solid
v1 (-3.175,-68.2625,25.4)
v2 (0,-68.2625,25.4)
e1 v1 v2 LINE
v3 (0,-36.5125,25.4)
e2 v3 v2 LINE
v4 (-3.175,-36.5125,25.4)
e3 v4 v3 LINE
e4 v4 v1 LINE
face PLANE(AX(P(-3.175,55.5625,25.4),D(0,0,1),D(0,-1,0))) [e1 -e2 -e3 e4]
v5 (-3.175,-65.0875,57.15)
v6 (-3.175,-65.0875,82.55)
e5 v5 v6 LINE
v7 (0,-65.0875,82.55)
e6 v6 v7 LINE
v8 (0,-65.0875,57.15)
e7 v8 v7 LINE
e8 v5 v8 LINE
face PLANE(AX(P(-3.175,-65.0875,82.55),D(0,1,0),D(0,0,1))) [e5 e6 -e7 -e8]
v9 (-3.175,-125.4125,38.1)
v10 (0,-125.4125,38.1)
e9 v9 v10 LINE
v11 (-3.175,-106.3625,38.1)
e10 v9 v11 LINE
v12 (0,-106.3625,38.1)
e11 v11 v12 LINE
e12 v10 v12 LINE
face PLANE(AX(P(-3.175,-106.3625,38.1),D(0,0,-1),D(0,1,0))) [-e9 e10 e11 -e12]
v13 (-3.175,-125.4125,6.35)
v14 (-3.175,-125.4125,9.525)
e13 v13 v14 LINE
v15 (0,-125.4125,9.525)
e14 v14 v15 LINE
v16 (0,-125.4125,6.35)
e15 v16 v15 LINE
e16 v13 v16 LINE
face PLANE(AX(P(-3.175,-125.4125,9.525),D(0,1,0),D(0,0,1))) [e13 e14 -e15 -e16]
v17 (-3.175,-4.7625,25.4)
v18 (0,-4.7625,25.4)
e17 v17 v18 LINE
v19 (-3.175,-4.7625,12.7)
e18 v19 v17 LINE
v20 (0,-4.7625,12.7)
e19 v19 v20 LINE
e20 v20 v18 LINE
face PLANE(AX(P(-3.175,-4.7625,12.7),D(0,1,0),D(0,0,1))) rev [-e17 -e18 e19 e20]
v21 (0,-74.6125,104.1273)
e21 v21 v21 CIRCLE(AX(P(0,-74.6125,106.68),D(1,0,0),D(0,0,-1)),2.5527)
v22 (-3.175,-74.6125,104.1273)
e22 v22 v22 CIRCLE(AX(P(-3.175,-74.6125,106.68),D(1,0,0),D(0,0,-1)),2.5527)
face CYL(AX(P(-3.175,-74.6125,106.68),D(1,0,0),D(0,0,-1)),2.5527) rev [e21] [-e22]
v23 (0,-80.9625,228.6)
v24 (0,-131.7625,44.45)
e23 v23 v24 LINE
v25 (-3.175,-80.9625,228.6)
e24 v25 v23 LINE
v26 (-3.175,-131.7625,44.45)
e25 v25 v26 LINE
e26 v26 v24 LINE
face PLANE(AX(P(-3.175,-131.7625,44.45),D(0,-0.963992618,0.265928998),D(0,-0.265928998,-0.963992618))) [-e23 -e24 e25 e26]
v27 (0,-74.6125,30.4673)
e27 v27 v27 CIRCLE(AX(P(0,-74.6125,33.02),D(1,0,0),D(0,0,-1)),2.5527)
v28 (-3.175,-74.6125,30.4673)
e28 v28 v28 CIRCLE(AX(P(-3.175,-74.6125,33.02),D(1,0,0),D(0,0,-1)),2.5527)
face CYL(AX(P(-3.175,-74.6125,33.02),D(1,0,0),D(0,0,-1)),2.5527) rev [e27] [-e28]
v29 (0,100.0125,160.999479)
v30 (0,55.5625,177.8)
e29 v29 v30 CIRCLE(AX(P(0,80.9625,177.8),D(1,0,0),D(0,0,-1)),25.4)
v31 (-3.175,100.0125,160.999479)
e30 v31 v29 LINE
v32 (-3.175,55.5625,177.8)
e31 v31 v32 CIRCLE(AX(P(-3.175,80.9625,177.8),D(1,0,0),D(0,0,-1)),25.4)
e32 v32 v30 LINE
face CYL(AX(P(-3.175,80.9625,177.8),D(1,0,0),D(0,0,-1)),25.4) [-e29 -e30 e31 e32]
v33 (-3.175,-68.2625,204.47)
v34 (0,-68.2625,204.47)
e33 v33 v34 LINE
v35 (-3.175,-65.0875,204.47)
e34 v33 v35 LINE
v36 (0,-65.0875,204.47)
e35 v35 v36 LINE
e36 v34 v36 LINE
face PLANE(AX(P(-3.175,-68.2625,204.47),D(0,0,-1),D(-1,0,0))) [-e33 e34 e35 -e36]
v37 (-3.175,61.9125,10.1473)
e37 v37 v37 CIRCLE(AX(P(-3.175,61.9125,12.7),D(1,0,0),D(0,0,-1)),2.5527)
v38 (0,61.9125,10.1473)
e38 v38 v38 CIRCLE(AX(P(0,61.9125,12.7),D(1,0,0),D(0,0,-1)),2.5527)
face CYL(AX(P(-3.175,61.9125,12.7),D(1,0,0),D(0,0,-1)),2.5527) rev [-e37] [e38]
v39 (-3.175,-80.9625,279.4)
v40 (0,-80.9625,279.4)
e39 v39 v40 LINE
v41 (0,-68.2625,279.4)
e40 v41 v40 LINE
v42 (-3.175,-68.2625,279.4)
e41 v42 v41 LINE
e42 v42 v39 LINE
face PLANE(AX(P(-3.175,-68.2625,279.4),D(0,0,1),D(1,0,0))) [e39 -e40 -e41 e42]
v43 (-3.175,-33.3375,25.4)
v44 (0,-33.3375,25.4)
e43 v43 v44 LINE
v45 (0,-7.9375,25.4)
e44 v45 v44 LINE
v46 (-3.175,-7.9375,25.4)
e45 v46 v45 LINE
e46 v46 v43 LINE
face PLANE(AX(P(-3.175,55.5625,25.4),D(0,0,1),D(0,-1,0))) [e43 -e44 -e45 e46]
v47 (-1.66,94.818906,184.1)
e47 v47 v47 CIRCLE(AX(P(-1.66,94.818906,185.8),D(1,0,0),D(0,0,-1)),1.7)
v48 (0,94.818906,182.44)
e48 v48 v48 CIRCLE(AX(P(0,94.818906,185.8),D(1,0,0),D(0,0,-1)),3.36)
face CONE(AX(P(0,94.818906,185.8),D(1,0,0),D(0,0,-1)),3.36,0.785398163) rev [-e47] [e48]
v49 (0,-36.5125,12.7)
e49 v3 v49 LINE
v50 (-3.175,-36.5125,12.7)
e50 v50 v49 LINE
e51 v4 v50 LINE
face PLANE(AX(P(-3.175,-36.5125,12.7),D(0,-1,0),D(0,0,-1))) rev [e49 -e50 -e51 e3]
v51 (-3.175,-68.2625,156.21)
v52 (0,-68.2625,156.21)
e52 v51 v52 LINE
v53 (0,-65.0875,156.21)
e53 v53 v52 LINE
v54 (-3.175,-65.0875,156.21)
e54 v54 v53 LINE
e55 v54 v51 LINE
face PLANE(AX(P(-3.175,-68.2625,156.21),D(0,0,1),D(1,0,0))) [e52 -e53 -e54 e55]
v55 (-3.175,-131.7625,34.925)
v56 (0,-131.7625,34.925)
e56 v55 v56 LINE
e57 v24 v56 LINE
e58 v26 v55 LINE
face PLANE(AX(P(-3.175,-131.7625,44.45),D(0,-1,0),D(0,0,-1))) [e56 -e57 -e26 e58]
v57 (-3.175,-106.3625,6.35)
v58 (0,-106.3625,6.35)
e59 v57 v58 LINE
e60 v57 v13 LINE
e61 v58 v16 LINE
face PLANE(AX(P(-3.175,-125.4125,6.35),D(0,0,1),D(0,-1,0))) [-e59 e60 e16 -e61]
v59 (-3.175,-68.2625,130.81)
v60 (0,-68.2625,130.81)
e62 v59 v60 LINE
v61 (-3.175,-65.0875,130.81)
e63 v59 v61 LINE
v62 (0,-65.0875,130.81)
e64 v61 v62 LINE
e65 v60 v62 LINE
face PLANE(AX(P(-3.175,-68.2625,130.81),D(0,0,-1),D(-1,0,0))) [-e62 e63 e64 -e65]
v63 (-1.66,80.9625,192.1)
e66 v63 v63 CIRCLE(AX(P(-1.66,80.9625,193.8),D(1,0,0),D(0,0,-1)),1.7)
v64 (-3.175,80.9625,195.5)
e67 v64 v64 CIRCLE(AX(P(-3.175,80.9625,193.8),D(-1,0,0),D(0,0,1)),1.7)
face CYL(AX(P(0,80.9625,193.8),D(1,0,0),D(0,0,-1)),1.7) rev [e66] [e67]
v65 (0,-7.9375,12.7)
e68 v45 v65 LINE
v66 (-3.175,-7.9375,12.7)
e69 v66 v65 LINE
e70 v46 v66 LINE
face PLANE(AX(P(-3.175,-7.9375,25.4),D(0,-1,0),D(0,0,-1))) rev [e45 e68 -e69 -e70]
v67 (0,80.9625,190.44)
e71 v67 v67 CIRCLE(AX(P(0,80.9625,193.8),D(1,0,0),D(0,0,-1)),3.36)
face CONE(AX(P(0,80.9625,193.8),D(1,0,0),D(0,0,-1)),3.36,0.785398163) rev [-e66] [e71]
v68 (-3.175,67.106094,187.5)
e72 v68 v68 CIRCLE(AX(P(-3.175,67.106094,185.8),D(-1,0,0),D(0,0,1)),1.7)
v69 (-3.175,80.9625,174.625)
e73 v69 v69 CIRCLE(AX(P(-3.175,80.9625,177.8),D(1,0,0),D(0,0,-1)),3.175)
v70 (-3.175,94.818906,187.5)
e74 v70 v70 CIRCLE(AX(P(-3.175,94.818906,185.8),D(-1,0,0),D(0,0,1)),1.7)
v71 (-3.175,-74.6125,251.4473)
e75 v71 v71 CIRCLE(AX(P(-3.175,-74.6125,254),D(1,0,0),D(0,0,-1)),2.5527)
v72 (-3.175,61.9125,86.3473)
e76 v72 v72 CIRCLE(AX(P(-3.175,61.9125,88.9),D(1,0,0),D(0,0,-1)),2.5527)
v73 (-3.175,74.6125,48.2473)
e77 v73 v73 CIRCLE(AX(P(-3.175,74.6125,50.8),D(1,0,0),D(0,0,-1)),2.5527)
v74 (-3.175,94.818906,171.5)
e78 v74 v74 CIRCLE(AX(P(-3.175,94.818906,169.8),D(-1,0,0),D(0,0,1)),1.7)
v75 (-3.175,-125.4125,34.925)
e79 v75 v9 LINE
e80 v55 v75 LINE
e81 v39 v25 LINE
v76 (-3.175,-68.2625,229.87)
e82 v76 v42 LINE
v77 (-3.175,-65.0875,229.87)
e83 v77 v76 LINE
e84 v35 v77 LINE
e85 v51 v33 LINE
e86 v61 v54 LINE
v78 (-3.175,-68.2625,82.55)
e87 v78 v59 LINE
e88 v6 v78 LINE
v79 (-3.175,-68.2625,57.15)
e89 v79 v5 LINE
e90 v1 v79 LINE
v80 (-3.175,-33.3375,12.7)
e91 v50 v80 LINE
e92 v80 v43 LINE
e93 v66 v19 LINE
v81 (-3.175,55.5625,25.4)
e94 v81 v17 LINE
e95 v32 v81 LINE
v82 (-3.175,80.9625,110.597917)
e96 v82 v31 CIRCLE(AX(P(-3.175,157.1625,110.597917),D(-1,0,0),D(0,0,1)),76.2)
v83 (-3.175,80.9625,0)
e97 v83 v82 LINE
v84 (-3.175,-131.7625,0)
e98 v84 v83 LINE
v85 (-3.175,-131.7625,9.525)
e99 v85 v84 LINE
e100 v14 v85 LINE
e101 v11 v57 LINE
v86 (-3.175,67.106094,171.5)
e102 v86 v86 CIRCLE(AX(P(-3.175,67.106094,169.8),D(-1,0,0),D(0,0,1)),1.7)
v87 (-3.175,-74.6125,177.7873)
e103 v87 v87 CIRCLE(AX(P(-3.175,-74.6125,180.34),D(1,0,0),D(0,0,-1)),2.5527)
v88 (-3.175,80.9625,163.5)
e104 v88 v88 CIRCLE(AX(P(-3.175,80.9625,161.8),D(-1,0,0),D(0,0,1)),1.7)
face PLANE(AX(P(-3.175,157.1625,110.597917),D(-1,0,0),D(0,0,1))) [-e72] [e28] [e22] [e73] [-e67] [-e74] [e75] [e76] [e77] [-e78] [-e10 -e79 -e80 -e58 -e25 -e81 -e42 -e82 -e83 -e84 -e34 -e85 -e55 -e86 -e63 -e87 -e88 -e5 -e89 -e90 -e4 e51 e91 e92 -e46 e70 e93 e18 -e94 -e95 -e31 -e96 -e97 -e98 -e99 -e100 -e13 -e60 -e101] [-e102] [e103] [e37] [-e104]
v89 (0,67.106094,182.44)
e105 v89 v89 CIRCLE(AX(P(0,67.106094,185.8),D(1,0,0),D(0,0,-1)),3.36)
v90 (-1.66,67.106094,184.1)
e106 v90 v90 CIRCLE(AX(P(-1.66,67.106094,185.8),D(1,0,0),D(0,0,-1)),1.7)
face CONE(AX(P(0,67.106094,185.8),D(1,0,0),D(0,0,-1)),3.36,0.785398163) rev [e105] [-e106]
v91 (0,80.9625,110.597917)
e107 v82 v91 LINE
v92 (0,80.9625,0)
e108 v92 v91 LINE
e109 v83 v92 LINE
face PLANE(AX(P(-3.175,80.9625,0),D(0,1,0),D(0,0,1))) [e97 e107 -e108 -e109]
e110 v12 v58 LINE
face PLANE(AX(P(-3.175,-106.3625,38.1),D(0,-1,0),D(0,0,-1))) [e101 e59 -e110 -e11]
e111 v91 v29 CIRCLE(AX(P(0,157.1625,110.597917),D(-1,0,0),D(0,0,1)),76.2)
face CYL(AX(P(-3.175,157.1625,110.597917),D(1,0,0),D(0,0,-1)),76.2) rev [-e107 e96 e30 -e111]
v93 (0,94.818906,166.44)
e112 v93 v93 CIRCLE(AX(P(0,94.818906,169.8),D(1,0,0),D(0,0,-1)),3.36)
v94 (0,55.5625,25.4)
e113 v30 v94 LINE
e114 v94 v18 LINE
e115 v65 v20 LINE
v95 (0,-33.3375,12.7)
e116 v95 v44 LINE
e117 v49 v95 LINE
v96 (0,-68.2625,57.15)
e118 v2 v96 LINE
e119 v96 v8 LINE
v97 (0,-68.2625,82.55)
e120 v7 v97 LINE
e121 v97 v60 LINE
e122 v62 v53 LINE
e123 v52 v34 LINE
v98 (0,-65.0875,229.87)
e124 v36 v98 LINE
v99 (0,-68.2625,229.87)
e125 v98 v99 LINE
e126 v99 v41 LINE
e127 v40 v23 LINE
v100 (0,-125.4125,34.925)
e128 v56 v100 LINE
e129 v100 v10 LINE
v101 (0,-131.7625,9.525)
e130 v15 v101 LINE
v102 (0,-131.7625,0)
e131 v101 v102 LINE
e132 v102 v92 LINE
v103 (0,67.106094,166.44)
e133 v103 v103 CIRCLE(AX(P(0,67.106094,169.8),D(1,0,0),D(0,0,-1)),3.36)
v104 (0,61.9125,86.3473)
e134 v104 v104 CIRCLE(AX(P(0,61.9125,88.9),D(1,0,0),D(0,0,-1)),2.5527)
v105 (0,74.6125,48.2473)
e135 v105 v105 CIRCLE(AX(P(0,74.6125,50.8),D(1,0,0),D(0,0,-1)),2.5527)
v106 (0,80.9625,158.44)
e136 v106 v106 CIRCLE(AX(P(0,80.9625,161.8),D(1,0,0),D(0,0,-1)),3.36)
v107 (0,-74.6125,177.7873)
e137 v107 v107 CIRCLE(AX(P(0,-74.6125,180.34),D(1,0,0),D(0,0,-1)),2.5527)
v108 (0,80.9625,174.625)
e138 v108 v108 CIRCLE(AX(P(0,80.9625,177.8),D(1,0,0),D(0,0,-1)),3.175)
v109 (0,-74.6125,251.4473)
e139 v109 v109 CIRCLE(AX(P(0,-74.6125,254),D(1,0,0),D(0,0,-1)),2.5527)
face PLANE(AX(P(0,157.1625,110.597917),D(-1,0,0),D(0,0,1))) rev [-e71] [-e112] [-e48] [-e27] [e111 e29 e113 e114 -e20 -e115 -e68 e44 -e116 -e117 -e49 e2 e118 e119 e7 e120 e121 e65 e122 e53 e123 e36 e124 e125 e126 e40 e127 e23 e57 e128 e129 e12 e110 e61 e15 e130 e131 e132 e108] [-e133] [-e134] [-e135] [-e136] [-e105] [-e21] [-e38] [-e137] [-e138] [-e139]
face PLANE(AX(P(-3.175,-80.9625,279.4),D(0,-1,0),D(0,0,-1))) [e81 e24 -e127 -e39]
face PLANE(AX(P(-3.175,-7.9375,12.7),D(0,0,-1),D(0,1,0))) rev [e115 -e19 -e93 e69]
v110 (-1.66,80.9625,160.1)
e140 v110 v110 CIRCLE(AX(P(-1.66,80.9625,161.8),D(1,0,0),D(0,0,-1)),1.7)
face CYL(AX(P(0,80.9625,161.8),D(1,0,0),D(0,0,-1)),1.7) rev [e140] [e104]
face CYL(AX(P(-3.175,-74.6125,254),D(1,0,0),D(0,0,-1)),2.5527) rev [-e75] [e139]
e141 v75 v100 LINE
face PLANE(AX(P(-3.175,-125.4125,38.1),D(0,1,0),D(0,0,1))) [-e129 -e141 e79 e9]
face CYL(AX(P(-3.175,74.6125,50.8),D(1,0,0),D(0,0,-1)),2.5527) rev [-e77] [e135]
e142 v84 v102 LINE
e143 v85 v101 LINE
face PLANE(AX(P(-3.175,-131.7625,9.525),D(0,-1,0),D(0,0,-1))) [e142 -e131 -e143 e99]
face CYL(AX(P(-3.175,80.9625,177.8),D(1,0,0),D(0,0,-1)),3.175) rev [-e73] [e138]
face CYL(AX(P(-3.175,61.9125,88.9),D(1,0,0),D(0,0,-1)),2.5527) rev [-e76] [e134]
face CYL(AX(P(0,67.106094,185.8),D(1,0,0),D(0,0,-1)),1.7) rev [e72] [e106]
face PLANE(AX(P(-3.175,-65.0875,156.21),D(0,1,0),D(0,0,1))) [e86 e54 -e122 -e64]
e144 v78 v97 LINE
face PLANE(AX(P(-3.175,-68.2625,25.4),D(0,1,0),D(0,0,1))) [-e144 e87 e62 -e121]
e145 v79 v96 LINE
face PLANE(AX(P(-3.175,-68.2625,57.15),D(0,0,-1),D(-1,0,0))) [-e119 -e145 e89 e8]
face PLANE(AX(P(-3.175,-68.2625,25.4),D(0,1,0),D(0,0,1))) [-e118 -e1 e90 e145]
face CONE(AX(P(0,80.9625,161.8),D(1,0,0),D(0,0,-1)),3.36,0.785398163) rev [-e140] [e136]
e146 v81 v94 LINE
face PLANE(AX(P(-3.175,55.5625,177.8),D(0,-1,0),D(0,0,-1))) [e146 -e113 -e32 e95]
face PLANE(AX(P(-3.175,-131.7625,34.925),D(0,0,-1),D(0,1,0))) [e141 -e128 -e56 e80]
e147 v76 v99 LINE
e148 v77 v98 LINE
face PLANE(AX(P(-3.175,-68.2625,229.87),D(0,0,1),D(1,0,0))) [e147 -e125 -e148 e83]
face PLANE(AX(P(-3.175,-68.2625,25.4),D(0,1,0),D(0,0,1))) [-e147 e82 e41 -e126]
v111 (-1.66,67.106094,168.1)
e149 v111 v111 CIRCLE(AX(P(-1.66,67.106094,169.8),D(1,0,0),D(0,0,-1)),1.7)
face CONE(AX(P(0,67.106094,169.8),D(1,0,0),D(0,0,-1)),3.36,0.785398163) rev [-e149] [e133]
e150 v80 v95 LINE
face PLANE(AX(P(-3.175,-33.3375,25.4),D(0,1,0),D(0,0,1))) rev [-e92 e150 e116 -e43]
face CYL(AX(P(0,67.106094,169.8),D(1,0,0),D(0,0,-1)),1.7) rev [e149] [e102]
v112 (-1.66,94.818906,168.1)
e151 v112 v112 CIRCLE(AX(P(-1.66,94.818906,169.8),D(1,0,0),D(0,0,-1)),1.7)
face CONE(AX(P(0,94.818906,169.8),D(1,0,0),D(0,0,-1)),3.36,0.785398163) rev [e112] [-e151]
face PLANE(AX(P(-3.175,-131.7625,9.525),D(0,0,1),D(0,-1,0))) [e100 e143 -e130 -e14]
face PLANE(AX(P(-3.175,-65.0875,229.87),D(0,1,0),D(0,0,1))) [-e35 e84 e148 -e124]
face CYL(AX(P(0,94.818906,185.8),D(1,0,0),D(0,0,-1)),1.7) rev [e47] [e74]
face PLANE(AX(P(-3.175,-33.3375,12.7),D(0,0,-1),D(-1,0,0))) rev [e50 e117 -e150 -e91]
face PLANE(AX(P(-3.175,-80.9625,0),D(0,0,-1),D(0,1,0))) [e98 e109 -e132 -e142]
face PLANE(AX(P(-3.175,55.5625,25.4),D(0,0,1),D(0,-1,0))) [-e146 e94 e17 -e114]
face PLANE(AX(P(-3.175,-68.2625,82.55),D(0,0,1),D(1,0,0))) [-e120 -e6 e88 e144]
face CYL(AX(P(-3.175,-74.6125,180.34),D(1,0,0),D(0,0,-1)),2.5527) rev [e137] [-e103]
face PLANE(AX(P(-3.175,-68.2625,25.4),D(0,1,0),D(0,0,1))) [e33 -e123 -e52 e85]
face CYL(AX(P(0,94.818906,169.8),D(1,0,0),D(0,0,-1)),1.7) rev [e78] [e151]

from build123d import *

# Parameters (mm, degrees)
BASE_FLANGE1_DEPTH           = 3.175
SKETCH8_W                    = 12.7
SKETCH8_H                    = 3.175
CUT_EXTRUDE2_DEPTH           = 309.926847379
SKETCH11_R                   = 3.175
CUT_EXTRUDE4_DEPTH           = 309.926847379
SKETCH21_R                   = 2.5527
CUT_EXTRUDE5_DEPTH           = 309.926847379
SKETCH23_W                   = 25.4
SKETCH23_H                   = 3.175
TAB1_DEPTH                   = 3.175
CSK_FOR_M3_SFHCS1_AT_2_COUNT = 2
CSK_FOR_M3_SFHCS1_AT_2_PITCH = 16
CSK_FOR_M3_SFHCS1_AT_3_COUNT = 2
CSK_FOR_M3_SFHCS1_AT_3_PITCH = 27.712812921
CSK_FOR_M3_SFHCS1_AT_4_COUNT = 2
CSK_FOR_M3_SFHCS1_AT_4_PITCH = 32
CSK_FOR_M3_SFHCS1_AT_5_COUNT = 2
CSK_FOR_M3_SFHCS1_AT_5_PITCH = 27.712812921
CSK_FOR_M3_SFHCS1_AT_6_COUNT = 2
CSK_FOR_M3_SFHCS1_AT_6_PITCH = 16


# Sheet-metal steps are written as plain solids
with BuildPart() as part:
    # Sketch1 → Base-Flange1 (new body)
    with BuildSketch(Plane(origin=(0, 0, 0), x_dir=(0, 0, -1), z_dir=(1, 0, 0))):
        with BuildLine():
            Line((0, -80.9625), (0, 80.9625))
            Line((0, 80.9625), (-110.597916699, 80.9625))
            ThreePointArc((-110.597916699, 80.9625), (-137.538685062, 85.883926782), (-160.999479175, 100.0125))
            ThreePointArc((-160.999479175, 100.0125), (-201.559524406, 89.942756121), (-177.8, 55.5625))
            Line((-177.8, 55.5625), (-25.4, 55.5625))
            Line((-25.4, 55.5625), (-25.4, -68.2625))
            Line((-25.4, -68.2625), (-279.4, -68.2625))
            Line((-279.4, -68.2625), (-279.4, -80.9625))
            Line((-279.4, -80.9625), (-228.6, -80.9625))
            Line((-228.6, -80.9625), (-44.45, -131.7625))
            Line((-44.45, -131.7625), (-34.925, -131.7625))
            Line((-34.925, -131.7625), (-34.925, -125.4125))
            Line((-34.925, -125.4125), (-38.1, -125.4125))
            Line((-38.1, -125.4125), (-38.1, -106.3625))
            Line((-38.1, -106.3625), (-6.35, -106.3625))
            Line((-6.35, -106.3625), (-6.35, -125.4125))
            Line((-6.35, -125.4125), (-9.525, -125.4125))
            Line((-9.525, -125.4125), (-9.525, -131.7625))
            Line((-9.525, -131.7625), (0, -131.7625))
            Line((0, -131.7625), (0, -80.9625))
        make_face()
    extrude(amount=-BASE_FLANGE1_DEPTH)

    # Sketch8 → Cut-Extrude2 (cut, through all)
    with BuildSketch(Plane(origin=(0, 0, 0), x_dir=(0, 0, -1), z_dir=(1, 0, 0))):
        with Locations((-19.05, -6.35)):
            Rectangle(SKETCH8_W, SKETCH8_H)
        with Locations((-19.05, -34.925)):
            Rectangle(SKETCH8_W, SKETCH8_H)
    extrude(amount=-CUT_EXTRUDE2_DEPTH, mode=Mode.SUBTRACT)

    # Sketch11 → Cut-Extrude4 (cut, through all)
    with BuildSketch(Plane(origin=(0, 0, 0), x_dir=(0, 0, -1), z_dir=(1, 0, 0))):
        with Locations((-177.8, 80.9625)):
            Circle(SKETCH11_R)
    extrude(amount=-CUT_EXTRUDE4_DEPTH, mode=Mode.SUBTRACT)

    # Sketch21 → Cut-Extrude5 (cut, through all)
    with BuildSketch(Plane(origin=(0, 0, 0), x_dir=(0, 0, -1), z_dir=(1, 0, 0))):
        with Locations((-33.02, -74.6125)):
            Circle(SKETCH21_R)
        with Locations((-106.68, -74.6125)):
            Circle(SKETCH21_R)
        with Locations((-180.34, -74.6125)):
            Circle(SKETCH21_R)
        with Locations((-254, -74.6125)):
            Circle(SKETCH21_R)
        with Locations((-12.7, 61.9125)):
            Circle(SKETCH21_R)
        with Locations((-50.8, 74.6125)):
            Circle(SKETCH21_R)
        with Locations((-88.9, 61.9125)):
            Circle(SKETCH21_R)
    extrude(amount=-CUT_EXTRUDE5_DEPTH, mode=Mode.SUBTRACT)

    # Sketch23 → Tab1 (add)
    with BuildSketch(Plane(origin=(0, 0, 0), x_dir=(0, 0, -1), z_dir=(1, 0, 0))):
        with Locations((-217.17, -66.675)):
            Rectangle(SKETCH23_W, SKETCH23_H)
        with Locations((-143.51, -66.675)):
            Rectangle(SKETCH23_W, SKETCH23_H)
        with Locations((-69.85, -66.675)):
            Rectangle(SKETCH23_W, SKETCH23_H)
    extrude(amount=-TAB1_DEPTH)

    # Sketch25 → CSK for M3 SFHCS1 (revolve, cut)
    with BuildSketch(Plane(origin=(0, 80.9625, 161.8), x_dir=(0, 0, -1), z_dir=(0, 1, 0))):
        Polygon((0, 0), (0, 3.175), (1.7, 3.175), (1.7, 1.66), (3.36, 0), align=None)
    csk_for_m3_sfhcs1 = revolve(axis=Axis((6.35, 80.9625, 161.8), (-1, 0, 0)), mode=Mode.SUBTRACT)

    # CSK for M3 SFHCS1 at 2: CSK for M3 SFHCS1 ×2
    with Locations(*[Vector(0, -0.8660254037844389, 0.4999999999999998) * (i * CSK_FOR_M3_SFHCS1_AT_2_PITCH) for i in range(1, CSK_FOR_M3_SFHCS1_AT_2_COUNT)]):
        add(csk_for_m3_sfhcs1, mode=Mode.SUBTRACT)

    # CSK for M3 SFHCS1 at 3: CSK for M3 SFHCS1 ×2
    with Locations(*[Vector(0, -0.500000000000002, 0.8660254037844376) * (i * CSK_FOR_M3_SFHCS1_AT_3_PITCH) for i in range(1, CSK_FOR_M3_SFHCS1_AT_3_COUNT)]):
        add(csk_for_m3_sfhcs1, mode=Mode.SUBTRACT)

    # CSK for M3 SFHCS1 at 4: CSK for M3 SFHCS1 ×2
    with Locations(*[(0, 0, i * CSK_FOR_M3_SFHCS1_AT_4_PITCH) for i in range(1, CSK_FOR_M3_SFHCS1_AT_4_COUNT)]):
        add(csk_for_m3_sfhcs1, mode=Mode.SUBTRACT)

    # CSK for M3 SFHCS1 at 5: CSK for M3 SFHCS1 ×2
    with Locations(*[Vector(0, 0.5000000000000007, 0.8660254037844384) * (i * CSK_FOR_M3_SFHCS1_AT_5_PITCH) for i in range(1, CSK_FOR_M3_SFHCS1_AT_5_COUNT)]):
        add(csk_for_m3_sfhcs1, mode=Mode.SUBTRACT)

    # CSK for M3 SFHCS1 at 6: CSK for M3 SFHCS1 ×2
    with Locations(*[Vector(0, 0.8660254037844379, 0.5000000000000013) * (i * CSK_FOR_M3_SFHCS1_AT_6_PITCH) for i in range(1, CSK_FOR_M3_SFHCS1_AT_6_COUNT)]):
        add(csk_for_m3_sfhcs1, mode=Mode.SUBTRACT)


solid = part.part
